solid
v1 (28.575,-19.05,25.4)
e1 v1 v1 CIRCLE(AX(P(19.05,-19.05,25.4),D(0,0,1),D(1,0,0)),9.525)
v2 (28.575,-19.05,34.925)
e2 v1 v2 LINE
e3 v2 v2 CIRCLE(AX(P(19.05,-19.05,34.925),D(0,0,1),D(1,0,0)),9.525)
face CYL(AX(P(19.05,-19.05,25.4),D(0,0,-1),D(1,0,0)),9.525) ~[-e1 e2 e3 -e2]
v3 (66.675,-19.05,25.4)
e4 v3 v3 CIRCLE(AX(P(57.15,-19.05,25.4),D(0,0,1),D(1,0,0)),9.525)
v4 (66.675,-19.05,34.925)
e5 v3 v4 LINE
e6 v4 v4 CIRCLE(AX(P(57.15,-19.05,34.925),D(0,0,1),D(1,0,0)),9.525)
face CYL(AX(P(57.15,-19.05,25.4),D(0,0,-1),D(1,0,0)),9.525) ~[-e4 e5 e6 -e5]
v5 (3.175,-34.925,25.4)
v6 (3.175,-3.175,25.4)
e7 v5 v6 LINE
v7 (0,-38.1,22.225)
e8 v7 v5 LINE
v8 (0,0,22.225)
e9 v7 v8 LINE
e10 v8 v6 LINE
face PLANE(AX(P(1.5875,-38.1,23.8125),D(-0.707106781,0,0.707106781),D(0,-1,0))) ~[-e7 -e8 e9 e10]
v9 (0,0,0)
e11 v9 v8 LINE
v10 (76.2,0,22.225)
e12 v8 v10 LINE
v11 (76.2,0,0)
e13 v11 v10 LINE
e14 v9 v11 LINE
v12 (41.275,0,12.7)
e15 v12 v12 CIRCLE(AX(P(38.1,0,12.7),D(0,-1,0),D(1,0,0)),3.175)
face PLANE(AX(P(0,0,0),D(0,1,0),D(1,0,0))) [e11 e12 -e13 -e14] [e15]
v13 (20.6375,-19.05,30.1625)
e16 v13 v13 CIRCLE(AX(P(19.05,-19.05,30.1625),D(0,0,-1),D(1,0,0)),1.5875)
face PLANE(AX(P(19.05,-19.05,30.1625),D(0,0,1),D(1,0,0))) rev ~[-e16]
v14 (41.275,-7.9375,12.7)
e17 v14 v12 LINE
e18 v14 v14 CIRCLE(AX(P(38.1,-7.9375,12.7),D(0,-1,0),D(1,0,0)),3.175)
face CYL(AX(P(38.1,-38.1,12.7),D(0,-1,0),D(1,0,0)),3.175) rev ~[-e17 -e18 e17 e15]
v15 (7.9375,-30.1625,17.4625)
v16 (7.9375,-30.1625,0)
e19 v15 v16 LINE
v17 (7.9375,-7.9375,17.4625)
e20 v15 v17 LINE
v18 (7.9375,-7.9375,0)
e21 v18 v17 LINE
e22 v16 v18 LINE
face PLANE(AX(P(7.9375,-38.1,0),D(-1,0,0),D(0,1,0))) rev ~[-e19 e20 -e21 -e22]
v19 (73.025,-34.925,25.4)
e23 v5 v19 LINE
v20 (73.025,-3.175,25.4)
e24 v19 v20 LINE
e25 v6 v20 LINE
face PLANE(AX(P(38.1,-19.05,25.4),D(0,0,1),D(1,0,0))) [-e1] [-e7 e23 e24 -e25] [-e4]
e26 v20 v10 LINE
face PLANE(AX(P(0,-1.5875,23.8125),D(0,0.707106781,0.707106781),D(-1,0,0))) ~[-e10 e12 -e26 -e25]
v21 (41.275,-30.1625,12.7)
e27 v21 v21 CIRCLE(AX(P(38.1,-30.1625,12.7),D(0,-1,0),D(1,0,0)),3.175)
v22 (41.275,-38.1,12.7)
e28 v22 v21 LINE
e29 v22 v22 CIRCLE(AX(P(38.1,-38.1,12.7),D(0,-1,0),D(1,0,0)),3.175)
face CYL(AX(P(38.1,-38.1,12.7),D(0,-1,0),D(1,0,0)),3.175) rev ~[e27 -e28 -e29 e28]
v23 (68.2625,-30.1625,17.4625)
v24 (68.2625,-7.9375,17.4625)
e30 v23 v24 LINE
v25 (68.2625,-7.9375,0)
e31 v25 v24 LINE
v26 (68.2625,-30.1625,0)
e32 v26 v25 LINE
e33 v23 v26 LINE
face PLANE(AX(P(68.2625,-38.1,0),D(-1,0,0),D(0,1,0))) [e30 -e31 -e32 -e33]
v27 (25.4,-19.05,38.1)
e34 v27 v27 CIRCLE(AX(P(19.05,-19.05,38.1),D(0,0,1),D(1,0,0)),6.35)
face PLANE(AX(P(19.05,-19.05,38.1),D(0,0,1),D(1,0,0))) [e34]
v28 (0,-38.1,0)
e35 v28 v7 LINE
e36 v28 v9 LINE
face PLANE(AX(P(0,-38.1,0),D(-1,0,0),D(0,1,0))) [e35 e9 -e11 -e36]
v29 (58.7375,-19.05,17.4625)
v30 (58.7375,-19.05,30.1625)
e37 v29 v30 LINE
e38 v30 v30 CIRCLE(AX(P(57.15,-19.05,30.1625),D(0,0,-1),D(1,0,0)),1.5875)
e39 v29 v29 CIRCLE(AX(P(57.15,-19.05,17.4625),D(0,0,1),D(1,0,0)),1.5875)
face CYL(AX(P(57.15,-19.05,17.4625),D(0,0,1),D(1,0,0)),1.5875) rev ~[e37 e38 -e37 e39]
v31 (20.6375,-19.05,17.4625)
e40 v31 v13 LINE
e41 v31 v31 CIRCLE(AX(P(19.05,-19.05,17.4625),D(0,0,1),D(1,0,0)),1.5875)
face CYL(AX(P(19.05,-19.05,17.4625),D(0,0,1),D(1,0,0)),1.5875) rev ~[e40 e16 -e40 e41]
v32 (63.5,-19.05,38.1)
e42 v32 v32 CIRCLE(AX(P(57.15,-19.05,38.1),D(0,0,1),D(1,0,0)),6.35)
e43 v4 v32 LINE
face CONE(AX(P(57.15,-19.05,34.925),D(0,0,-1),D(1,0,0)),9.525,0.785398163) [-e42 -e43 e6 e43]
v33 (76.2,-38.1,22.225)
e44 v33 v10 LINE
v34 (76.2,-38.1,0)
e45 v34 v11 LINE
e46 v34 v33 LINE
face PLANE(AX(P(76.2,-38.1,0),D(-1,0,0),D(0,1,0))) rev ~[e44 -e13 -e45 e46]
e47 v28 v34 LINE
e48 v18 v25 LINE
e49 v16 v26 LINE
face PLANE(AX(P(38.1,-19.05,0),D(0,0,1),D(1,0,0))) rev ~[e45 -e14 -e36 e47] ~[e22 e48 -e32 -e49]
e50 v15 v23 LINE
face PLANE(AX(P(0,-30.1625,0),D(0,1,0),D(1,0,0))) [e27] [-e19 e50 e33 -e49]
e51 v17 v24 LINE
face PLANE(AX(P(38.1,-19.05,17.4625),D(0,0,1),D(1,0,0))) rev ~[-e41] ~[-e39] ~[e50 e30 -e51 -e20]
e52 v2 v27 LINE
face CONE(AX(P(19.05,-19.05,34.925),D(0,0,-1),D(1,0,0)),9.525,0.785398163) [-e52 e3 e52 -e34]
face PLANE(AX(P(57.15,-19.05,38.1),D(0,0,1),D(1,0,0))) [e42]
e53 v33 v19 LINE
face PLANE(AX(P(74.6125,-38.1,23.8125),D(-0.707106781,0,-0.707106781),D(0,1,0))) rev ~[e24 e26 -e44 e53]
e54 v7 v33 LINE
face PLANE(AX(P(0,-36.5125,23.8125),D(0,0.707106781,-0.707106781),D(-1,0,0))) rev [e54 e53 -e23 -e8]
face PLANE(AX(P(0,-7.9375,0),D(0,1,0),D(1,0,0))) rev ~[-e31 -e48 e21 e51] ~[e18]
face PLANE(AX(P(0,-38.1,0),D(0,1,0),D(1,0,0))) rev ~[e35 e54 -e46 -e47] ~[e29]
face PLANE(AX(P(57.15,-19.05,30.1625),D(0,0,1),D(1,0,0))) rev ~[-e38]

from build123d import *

# Parameters (mm, degrees)
F0_W     = 76.2
F0_H     = 38.1
F1_DEPTH = 25.4
F2_R     = 9.525
F3_DEPTH = 12.7
F4_SIZE2 = 3.175
F4_SIZE  = 3.175
F5_T     = 7.9375
F6_R     = 3.175
F7_DEPTH = 38.1


# Not quite as in the source:
# - a shell that OpenCascade refuses in one call is made with other operations: the cavity is built on its own and cut out


with BuildPart() as f1:
    # F0 (on Top) → F1 (new body)
    with BuildSketch(Plane.XY):
        with Locations((38.1, -19.05)):
            Rectangle(F0_W, F0_H)
    extrude(amount=F1_DEPTH)

    # F2 (on face) → F3 (join)
    with BuildSketch(Plane.XY.offset(25.4)):
        with Locations((19.05, -19.05)):
            Circle(F2_R)
        with Locations((57.15, -19.05)):
            Circle(F2_R)
    extrude(amount=F3_DEPTH)

    # F4
    f4_edges = [f1.edges().sort_by_distance(p)[0] for p in [
        (9.525, -19.05, 38.1),
        (47.625, -19.05, 38.1),
        (38.1, -38.1, 25.4),
        (76.2, -19.05, 25.4),
        (38.1, 0, 25.4),
        (0, -19.05, 25.4),
    ]]
    chamfer(f4_edges, length=F4_SIZE, length2=F4_SIZE2)

    # F5: shell of thickness 7.9375, made by hand


with BuildPart() as f5_core1:
    # F5_t2: copy of F1
    add(f1.part)

    # the walls: a layer under each face that stays
    f5_faces = [f5_core1.faces().sort_by_distance(p)[0] for p in [
        (38.1, 0, 11.1125),
        (76.2, -19.05, 11.1125),
        (38.1, -1.5875, 23.8125),
        (0, -19.05, 11.1125),
        (38.1, -38.1, 11.1125),
        (74.6125, -19.05, 23.8125),
        (38.1, -19.05, 25.4),
        (1.5875, -19.05, 23.8125),
        (38.1, -36.5125, 23.8125),
        (9.525, -19.05, 30.1625),
        (47.625, -19.05, 30.1625),
        (11.1125, -19.05, 36.5125),
        (49.2125, -19.05, 36.5125),
        (19.05, -19.05, 38.1),
        (57.15, -19.05, 38.1),
    ]]
    thicken(f5_faces, amount=-F5_T, mode=Mode.SUBTRACT)

    # F5_s3 → F5_t4 (revolve, cut)
    with BuildSketch(Plane.XZ.offset(19.05)):
        Polygon((28.654375, 25.479375), (28.575, 17.4625), (20.6375, 17.4625), (20.6375, 25.4), align=None)
    revolve(axis=Axis((19.05, -19.05, 25.4), (0, 0, 1)), mode=Mode.SUBTRACT)

    # F5_s5 → F5_t6 (revolve, cut)
    with BuildSketch(Plane.XZ.offset(19.05)):
        Polygon((66.754375, 25.479375), (66.675, 17.4625), (58.7375, 17.4625), (58.7375, 25.4), align=None)
    revolve(axis=Axis((57.15, -19.05, 25.4), (0, 0, 1)), mode=Mode.SUBTRACT)


with BuildPart() as f1_1:
    add(f1.part)

    # what is left inside the walls is the cavity
    f5_cavity = [f5_core1.part.solids().sort_by_distance(p)[0] for p in [
        (38.1, -22.754167, 0.079375),
    ]]
    add(f5_cavity, mode=Mode.SUBTRACT)

    # F6 (on face) → F7 (cut)
    with BuildSketch(Plane.XZ.offset(38.1)):
        with Locations((38.1, 12.7)):
            Circle(F6_R)
    extrude(amount=-F7_DEPTH, mode=Mode.SUBTRACT)


solid = f1_1.part
